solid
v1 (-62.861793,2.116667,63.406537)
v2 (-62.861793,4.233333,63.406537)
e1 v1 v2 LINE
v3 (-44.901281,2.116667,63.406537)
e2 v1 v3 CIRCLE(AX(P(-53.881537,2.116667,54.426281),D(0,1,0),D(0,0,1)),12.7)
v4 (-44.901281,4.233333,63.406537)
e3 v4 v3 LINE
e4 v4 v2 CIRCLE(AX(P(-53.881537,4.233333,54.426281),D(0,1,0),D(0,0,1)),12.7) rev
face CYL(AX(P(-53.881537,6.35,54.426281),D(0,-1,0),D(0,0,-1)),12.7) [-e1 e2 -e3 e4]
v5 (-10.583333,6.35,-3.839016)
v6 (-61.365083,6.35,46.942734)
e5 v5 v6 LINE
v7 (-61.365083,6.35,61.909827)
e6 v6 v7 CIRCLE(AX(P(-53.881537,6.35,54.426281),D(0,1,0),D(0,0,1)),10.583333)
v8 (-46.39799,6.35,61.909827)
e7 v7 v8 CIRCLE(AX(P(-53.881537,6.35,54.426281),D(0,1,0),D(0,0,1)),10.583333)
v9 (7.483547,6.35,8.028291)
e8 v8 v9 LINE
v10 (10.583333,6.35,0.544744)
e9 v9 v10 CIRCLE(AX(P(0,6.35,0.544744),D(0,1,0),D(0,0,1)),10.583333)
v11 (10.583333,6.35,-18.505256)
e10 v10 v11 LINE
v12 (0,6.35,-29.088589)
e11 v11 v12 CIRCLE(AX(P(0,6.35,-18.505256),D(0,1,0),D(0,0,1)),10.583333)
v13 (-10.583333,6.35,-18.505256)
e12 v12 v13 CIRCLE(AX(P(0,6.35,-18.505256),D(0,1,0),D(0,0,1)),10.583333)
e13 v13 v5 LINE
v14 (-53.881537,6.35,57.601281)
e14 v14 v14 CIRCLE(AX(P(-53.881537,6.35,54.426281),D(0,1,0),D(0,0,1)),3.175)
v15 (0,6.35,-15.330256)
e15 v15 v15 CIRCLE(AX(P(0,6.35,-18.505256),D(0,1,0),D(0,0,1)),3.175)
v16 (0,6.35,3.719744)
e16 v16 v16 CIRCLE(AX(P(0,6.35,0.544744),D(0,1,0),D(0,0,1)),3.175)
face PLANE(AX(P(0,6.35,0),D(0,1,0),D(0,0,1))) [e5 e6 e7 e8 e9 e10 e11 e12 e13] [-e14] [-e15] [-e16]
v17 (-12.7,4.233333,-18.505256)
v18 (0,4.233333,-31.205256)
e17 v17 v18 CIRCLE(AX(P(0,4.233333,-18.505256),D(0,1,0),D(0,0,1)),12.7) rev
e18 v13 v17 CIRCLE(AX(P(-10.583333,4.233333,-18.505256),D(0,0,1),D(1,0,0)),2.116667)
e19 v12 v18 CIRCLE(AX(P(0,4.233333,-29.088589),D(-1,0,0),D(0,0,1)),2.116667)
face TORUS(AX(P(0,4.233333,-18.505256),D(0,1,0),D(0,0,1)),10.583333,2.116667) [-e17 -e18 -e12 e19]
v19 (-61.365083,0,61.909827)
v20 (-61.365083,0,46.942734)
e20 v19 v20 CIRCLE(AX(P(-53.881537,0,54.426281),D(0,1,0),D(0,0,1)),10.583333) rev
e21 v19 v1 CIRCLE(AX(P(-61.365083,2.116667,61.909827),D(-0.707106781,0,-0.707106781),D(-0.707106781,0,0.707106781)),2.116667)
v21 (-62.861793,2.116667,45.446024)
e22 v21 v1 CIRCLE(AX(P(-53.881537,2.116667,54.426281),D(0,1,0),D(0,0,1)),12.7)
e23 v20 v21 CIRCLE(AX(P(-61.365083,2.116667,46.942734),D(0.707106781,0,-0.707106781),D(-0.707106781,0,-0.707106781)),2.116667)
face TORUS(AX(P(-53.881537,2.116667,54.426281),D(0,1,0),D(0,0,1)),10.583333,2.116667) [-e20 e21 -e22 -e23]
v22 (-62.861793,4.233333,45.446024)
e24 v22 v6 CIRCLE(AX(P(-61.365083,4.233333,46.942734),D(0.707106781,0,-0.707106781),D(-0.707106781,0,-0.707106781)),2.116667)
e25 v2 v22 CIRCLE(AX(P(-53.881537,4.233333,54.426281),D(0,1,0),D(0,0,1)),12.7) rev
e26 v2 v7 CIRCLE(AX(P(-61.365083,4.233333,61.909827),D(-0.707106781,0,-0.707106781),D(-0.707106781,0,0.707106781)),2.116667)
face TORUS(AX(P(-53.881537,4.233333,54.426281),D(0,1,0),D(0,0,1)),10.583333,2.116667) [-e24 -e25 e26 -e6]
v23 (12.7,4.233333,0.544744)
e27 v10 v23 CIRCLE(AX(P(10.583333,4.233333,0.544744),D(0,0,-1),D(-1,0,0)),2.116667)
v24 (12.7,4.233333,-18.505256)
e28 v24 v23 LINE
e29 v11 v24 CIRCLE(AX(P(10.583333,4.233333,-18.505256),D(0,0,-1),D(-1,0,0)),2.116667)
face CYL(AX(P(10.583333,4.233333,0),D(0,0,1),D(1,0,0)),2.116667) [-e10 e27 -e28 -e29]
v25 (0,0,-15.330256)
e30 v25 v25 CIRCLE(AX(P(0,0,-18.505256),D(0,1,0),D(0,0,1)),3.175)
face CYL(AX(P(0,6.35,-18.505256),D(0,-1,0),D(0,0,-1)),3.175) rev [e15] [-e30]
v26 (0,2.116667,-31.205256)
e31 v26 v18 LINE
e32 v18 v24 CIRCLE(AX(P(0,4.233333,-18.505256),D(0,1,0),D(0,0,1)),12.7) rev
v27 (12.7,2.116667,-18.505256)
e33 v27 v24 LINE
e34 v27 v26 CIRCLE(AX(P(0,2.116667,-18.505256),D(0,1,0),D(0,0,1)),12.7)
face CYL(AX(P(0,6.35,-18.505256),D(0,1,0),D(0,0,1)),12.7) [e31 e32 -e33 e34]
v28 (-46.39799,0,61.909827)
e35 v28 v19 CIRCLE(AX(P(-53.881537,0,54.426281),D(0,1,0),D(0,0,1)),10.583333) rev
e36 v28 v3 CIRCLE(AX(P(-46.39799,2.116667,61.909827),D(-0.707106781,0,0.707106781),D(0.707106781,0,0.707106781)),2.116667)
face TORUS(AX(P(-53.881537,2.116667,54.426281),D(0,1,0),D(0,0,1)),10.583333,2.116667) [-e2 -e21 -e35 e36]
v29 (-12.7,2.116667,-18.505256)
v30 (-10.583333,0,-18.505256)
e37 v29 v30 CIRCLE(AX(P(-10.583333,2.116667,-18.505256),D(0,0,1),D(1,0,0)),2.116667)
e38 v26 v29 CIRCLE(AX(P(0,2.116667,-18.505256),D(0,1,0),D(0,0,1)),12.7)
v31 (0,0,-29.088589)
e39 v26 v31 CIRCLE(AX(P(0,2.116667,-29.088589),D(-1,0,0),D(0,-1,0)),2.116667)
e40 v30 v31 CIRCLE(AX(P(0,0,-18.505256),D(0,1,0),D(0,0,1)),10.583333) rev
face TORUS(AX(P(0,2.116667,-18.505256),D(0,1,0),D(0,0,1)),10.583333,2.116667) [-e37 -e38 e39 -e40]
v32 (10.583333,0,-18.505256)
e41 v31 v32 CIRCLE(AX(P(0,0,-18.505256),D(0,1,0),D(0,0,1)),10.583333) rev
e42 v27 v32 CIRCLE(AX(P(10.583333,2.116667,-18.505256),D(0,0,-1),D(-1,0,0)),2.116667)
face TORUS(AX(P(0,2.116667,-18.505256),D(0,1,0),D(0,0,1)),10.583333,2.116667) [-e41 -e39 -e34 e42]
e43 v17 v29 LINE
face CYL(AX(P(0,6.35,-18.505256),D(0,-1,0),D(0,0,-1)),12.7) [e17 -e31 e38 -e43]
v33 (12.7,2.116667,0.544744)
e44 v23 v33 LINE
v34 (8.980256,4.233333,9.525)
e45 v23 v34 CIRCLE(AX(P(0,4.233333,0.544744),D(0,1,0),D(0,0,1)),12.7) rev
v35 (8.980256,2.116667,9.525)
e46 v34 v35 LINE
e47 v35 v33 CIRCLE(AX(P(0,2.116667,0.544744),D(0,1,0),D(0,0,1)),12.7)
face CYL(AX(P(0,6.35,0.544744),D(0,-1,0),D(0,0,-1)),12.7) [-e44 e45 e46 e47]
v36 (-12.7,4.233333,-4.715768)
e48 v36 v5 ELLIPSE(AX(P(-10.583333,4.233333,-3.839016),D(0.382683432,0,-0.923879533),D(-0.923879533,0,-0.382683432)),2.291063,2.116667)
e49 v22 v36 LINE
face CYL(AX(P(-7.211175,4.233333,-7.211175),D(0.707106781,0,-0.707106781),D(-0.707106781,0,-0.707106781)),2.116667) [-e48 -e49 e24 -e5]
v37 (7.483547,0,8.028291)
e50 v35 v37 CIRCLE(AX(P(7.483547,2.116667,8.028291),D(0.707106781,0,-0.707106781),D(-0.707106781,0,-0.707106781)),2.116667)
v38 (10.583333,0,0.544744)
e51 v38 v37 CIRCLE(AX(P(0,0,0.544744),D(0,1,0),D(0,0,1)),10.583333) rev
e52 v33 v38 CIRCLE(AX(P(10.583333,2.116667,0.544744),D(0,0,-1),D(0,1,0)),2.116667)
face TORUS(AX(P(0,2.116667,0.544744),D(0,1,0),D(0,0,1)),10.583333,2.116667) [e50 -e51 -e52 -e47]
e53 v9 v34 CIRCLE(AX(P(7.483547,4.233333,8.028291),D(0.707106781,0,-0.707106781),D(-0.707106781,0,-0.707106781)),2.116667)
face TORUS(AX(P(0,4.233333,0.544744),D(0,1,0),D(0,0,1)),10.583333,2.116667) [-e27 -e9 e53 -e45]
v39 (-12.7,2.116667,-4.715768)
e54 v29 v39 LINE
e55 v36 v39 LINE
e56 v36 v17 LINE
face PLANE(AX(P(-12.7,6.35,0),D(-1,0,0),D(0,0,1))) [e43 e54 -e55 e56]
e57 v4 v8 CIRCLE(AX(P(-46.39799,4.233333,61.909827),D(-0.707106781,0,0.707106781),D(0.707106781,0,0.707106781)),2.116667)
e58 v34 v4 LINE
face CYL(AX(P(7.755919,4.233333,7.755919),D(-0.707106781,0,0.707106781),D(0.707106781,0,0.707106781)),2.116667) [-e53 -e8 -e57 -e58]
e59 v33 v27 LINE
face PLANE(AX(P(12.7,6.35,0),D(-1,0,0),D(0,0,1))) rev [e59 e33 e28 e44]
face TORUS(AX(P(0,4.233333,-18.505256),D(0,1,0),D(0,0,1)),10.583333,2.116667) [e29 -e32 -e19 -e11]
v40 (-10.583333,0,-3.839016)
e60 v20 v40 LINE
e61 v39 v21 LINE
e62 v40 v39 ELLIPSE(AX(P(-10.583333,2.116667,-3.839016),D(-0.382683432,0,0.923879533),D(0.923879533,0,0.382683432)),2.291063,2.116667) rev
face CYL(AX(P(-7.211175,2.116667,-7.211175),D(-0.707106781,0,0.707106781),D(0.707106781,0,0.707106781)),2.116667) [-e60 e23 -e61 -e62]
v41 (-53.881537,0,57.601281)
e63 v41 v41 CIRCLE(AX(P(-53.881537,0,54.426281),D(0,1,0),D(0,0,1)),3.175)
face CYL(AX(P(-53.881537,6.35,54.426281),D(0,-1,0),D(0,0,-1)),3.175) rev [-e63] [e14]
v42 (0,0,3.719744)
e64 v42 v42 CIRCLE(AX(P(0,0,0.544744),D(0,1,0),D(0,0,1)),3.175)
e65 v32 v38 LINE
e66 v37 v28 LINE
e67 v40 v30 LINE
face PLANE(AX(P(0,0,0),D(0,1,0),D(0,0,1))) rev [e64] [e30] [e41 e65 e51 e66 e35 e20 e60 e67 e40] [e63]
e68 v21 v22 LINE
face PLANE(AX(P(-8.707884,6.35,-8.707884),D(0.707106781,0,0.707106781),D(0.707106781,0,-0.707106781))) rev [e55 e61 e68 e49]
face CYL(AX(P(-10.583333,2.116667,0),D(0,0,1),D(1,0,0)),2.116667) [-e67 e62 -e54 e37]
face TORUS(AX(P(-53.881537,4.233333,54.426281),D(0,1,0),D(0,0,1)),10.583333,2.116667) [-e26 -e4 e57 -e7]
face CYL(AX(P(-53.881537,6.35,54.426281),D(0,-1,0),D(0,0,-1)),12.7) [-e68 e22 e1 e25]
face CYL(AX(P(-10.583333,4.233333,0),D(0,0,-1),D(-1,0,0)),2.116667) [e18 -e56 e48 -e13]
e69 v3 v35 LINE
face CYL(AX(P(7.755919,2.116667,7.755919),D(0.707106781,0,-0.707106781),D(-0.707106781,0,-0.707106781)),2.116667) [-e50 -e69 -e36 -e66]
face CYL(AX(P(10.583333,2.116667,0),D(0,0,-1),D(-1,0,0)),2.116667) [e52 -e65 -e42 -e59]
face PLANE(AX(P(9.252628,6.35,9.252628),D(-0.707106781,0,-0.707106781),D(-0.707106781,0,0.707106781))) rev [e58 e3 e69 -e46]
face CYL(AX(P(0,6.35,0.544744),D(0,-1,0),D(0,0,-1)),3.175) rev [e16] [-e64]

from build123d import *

# Parameters (mm, degrees)
SKETCH1_R           = 3.175
BOSS_EXTRUDE1_DEPTH = 6.35
FILLET2_R           = 12.7
FILLET3_R           = 2.116666667


with BuildPart() as part:
    # Sketch1 → Boss-Extrude1 (new body)
    with BuildSketch(Plane(origin=(0, 0, 0), x_dir=(1, 0, 0), z_dir=(0, 1, 0))):
        with BuildLine():
            Line((12.7, 31.205256121), (-12.7, 31.205256121))
            Line((-12.7, 31.205256121), (-12.7, 4.715768363))
            Line((-12.7, 4.715768363), (-71.842048969, -54.426280605))
            Line((-71.842048969, -54.426280605), (-53.881536726, -72.386792847))
            Line((-53.881536726, -72.386792847), (8.980256121, -9.525))
            ThreePointArc((8.980256121, -9.525), (11.733270063, -5.40482347), (12.7, -0.544743879))
            Line((12.7, -0.544743879), (12.7, 31.205256121))
        make_face()
        with Locations(Location((-53.881536726, -54.426280605, 0), (0, 0, 270))):
            Circle(SKETCH1_R, mode=Mode.SUBTRACT)
        with Locations(Location((0, -0.544743879, 0), (0, 0, 270))):
            Circle(SKETCH1_R, mode=Mode.SUBTRACT)
        with Locations(Location((0, 18.505256121, 0), (0, 0, 270))):
            Circle(SKETCH1_R, mode=Mode.SUBTRACT)
    extrude(amount=BOSS_EXTRUDE1_DEPTH)

    # Fillet2
    fillet2_edges = [part.edges().sort_by_distance(p)[0] for p in [
        (12.7, 3.175, -31.205256121),
        (-12.7, 3.175, -31.205256121),
        (-71.842048969, 3.175, 54.426280605),
        (-53.881536726, 3.175, 72.386792847),
    ]]
    fillet(fillet2_edges, radius=FILLET2_R - 0.0001)  # a hair under: the kernel refuses the full size

    # Fillet3
    fillet3_edges = [part.edges().sort_by_distance(p)[0] for p in [
        (11.733270063, 6.35, 5.40482347),
        (-37.780931779, 0, 20.365163416),
        (-12.7, 0, -11.610562242),
        (12.7, 0, -8.980306121),
        (11.733270063, 0, 5.40482347),
        (12.7, 6.35, -8.980306121),
        (-12.7, 6.35, -11.610562242),
        (-37.780931779, 6.35, 20.365163416),
        (-17.960547597, 0, 36.465803719),
        (-53.881536726, 0, 67.126322027),
        (-66.581578148, 0, 54.426280605),
        (-8.98028541, 0, -27.485541531),
        (8.98028541, 0, -27.485541531),
        (-17.960547597, 6.35, 36.465803719),
        (-53.881536726, 6.35, 67.126322027),
        (-66.581578148, 6.35, 54.426280605),
        (-8.98028541, 6.35, -27.485541531),
        (8.98028541, 6.35, -27.485541531),
    ]]
    fillet(fillet3_edges, radius=FILLET3_R)


solid = part.part
